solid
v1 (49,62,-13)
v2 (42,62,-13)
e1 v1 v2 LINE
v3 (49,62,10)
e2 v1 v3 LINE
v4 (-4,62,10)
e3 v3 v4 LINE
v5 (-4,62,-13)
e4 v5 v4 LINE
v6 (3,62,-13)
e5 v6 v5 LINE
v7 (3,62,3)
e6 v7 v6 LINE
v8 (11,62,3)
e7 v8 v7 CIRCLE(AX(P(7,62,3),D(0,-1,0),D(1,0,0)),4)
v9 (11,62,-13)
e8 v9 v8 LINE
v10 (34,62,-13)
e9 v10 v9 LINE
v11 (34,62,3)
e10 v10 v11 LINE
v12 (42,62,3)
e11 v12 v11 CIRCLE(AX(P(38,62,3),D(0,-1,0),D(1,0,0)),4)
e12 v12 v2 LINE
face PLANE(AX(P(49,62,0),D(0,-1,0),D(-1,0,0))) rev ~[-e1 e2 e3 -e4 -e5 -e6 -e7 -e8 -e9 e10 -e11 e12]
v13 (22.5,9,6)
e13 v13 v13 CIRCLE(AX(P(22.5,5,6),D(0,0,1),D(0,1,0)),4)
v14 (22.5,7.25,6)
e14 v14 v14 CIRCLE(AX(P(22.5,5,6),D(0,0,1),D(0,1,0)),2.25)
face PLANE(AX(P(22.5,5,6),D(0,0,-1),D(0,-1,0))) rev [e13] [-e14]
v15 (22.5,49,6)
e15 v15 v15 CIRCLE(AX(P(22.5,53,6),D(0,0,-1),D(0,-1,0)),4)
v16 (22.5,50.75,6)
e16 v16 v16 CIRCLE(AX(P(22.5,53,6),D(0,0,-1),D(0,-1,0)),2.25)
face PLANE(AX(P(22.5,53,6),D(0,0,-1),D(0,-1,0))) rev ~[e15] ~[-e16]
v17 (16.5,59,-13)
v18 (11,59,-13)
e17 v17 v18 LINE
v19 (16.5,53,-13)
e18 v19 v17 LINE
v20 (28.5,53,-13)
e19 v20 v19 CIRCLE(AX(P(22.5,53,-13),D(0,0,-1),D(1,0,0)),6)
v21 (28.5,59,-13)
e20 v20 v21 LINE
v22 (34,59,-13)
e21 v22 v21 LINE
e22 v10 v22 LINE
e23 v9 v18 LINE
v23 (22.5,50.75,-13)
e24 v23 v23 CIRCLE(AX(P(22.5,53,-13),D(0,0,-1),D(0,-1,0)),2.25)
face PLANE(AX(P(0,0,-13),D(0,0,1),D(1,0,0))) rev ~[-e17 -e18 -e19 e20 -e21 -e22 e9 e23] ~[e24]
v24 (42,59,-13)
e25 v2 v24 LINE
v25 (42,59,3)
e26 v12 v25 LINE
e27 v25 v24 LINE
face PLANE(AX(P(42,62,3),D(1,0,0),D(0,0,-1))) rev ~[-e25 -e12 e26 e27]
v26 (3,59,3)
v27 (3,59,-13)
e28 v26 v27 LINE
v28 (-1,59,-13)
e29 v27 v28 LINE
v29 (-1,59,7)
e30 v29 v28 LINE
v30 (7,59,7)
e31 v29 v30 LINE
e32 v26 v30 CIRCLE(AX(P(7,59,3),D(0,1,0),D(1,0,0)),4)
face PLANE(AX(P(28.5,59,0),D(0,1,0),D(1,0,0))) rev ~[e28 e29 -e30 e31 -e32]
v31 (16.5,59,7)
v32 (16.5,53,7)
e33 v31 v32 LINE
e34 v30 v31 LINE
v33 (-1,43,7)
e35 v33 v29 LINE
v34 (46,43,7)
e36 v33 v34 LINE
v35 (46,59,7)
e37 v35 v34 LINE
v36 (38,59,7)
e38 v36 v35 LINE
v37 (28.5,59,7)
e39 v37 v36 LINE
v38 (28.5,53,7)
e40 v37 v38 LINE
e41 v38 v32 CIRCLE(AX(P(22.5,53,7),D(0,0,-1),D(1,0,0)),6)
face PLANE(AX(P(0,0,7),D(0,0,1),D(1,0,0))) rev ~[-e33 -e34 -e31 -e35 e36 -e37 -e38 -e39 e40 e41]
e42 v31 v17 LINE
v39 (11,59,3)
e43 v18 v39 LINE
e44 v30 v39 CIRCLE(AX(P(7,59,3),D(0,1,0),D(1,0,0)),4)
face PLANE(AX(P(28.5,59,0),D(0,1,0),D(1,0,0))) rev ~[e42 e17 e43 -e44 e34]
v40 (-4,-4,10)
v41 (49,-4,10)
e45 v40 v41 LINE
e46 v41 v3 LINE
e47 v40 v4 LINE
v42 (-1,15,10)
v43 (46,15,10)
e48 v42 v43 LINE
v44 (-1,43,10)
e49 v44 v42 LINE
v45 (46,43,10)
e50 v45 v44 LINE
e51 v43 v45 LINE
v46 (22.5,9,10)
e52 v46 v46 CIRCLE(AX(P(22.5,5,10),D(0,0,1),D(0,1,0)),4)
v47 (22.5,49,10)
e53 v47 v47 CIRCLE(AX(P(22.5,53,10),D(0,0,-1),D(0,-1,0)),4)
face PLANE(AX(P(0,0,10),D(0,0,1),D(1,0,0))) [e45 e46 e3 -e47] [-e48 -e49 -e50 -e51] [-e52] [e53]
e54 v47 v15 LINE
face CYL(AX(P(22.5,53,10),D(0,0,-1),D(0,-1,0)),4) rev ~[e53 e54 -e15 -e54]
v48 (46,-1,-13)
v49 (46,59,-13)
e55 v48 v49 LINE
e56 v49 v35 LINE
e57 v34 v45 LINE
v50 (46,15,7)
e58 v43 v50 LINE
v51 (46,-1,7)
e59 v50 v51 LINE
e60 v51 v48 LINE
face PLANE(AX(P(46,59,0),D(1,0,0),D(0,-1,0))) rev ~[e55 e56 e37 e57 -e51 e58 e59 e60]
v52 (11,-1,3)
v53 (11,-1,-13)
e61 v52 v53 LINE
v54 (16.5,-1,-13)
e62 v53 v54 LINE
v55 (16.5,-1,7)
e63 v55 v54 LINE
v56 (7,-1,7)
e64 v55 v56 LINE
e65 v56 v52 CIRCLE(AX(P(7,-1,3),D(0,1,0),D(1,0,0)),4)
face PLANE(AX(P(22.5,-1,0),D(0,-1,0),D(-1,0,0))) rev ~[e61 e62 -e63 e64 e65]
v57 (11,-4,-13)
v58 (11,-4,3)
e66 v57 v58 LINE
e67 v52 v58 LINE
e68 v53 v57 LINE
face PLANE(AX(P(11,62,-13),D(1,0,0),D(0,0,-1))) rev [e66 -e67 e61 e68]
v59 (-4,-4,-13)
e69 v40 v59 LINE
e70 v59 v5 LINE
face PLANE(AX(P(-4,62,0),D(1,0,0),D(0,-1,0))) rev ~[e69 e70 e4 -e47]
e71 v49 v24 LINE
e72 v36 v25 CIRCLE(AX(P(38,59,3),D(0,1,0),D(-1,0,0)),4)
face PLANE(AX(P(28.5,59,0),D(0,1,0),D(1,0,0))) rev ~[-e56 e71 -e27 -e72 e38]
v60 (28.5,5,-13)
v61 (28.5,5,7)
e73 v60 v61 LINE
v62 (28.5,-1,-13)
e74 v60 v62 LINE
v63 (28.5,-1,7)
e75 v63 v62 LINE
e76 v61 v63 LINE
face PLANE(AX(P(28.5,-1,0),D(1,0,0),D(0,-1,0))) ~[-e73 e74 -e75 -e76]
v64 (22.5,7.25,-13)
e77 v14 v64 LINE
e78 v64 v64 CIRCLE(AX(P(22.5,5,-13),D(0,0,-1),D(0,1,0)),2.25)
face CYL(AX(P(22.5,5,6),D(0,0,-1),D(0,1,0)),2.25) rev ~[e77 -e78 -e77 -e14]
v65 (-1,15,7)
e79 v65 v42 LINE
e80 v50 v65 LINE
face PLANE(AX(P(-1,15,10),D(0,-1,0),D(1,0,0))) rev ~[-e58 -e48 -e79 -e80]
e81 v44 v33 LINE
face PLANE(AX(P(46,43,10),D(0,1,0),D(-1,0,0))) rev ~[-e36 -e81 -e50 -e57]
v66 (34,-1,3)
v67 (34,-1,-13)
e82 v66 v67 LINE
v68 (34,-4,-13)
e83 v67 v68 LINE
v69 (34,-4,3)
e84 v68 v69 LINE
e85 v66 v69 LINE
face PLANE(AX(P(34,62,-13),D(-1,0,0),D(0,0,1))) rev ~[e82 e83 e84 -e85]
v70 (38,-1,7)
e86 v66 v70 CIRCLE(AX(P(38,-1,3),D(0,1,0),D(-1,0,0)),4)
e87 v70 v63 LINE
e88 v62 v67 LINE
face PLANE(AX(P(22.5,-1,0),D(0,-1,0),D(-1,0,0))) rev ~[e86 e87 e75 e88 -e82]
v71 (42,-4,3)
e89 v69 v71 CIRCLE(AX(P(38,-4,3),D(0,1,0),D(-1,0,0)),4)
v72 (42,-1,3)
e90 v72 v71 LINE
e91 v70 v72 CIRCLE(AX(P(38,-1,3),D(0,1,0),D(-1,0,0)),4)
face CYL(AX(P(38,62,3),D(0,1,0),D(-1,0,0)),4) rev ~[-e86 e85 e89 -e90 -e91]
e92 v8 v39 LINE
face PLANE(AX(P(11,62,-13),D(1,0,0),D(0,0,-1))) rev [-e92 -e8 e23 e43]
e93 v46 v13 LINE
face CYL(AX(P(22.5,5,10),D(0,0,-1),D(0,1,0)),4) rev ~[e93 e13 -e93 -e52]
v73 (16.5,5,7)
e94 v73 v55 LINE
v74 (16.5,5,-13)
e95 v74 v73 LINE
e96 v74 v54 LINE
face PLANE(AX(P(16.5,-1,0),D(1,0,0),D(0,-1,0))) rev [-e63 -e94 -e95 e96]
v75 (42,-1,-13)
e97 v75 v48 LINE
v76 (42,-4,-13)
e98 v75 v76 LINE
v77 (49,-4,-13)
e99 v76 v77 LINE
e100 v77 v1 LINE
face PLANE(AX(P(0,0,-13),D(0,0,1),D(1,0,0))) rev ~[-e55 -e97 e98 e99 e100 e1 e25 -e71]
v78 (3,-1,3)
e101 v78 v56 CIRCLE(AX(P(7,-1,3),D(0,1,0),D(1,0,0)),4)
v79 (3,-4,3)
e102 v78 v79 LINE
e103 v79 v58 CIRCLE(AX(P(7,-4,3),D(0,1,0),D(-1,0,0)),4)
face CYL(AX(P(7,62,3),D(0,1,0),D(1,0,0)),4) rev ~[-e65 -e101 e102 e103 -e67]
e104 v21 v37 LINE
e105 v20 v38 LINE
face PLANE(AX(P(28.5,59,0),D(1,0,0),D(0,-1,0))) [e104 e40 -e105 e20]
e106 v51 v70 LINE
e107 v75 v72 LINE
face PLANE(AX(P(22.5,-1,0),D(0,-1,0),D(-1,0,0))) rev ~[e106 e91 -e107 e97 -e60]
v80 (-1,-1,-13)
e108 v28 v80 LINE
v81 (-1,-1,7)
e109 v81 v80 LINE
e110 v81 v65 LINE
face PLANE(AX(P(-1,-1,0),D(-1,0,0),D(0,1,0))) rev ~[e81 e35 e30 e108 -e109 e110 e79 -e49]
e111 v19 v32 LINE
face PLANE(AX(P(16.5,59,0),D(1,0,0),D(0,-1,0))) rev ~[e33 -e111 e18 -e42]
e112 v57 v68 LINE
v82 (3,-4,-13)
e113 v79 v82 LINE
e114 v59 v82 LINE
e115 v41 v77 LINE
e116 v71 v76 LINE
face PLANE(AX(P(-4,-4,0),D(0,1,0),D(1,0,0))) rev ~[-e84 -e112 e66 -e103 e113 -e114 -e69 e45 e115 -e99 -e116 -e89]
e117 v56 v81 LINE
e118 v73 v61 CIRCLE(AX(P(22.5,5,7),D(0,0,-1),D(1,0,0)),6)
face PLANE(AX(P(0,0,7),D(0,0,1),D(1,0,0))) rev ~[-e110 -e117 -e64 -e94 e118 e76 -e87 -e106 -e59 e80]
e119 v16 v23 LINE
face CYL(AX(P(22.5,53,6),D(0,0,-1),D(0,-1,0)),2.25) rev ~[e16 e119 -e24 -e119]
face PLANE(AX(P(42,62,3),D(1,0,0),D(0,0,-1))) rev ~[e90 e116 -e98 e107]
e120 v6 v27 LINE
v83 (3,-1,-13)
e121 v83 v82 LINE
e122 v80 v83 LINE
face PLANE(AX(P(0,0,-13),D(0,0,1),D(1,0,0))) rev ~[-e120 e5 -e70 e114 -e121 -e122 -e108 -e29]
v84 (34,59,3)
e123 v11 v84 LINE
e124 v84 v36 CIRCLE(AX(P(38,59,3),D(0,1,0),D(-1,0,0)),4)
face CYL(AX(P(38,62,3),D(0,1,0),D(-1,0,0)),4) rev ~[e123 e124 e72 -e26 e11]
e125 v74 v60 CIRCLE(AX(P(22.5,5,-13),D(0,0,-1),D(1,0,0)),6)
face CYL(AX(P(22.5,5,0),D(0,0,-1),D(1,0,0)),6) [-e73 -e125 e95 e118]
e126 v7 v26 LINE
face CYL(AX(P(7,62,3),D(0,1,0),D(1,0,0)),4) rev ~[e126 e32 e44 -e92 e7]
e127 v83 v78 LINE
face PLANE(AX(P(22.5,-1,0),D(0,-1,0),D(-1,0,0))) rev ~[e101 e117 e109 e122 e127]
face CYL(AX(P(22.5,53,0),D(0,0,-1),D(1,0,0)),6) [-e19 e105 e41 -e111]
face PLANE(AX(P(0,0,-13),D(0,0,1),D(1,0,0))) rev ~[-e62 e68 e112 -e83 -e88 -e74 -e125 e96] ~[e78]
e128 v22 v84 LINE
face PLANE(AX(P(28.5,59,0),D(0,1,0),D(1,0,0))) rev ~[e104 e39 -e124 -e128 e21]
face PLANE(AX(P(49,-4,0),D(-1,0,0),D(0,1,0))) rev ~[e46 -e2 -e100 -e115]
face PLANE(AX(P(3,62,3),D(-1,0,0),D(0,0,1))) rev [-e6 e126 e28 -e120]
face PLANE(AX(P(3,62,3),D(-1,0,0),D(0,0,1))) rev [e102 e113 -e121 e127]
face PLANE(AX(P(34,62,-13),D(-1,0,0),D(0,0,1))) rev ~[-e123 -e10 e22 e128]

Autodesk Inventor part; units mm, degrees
ref_plane "YZ Plane" through (0, 0, 0) normal (1, 0, 0) x (0, 1, 0)
sketch "Sketch1" plane through (0, 0, 0) normal (0, 0, 1) x (1, 0, 0)
  line L0 (0, 0) -> (45, 0)
  line L1 (45, 0) -> (45, 58)
  line L2 (45, 58) -> (0, 58)
  line L3 (0, 58) -> (0, 0)
  circle A0 centre (22.5, 53) radius 2.75
  circle A1 centre (22.5, 5) radius 2.75
  line L4 (19.75, 58) -> (19.75, 53)
  line L5 (25.25, 58) -> (25.25, 53)
  line L6 (0, 42) -> (45, 42)
  line L7 (45, 42) -> (45, 16)
  line L8 (45, 16) -> (0, 16)
  line L9 (0, 16) -> (0, 42)
  circle A2 centre (22.5, 53) radius 6
  circle A3 centre (22.5, 5) radius 6
  line L10 (16.5, 5) -> (16.5, -1)
  line L11 (28.5, 5) -> (28.5, -1)
  line L12 (16.5, 53) -> (16.5, 59)
  line L13 (28.5, 53) -> (28.5, 59)
  line L14 (-1, 59) -> (46, 59)
  line L15 (46, 59) -> (46, -1)
  line L16 (46, -1) -> (-1, -1)
  line L17 (-1, -1) -> (-1, 59)
  line L18 (49, 62) -> (-4, 62)
  line L19 (-4, 62) -> (-4, -4)
  line L20 (-4, -4) -> (49, -4)
  line L21 (49, -4) -> (49, 62)
  line L22 (28.5, 59) -> (16.5, 59)
  line L23 (28.5, -1) -> (16.5, -1)
  point P0 (22.5, 58)
  dimension "d0" = 45
  dimension "d1" = 58
  dimension "d2" = 5.5
  dimension "d3" = 5.5
  dimension "d4" = 5
  dimension "d5" = 5
  dimension "d6" = 26
  dimension "d7" = 16
  dimension "d8" = 12
  dimension "d9" = 12
  dimension "d10" = 1
  dimension "d11" = 3
extrude "Extrusion1" add sketch "Sketch1" along normal blind 10 contours L21 L20 L19 L18
sketch "Sketch2" plane through (0, 0, 10) normal (0, 0, 1) x (1, 0, 0)
  line L0 (-1, 59) -> (46, 59) projected
  line L1 (46, 59) -> (46, -1) projected
  line L2 (-1, 59) -> (46, 59)
  line L3 (46, 59) -> (46, 43)
  line L4 (46, 43) -> (-1, 43)
  line L5 (-1, 43) -> (-1, 59)
  line L6 (-1, -1) -> (-1, 59) projected
  line L7 (46, -1) -> (-1, -1)
  line L8 (-1, -1) -> (-1, 15)
  line L9 (-1, 15) -> (46, 15)
  line L10 (46, 15) -> (46, -1)
  point P0 (0, 0)
  dimension "d14" = 16
  dimension "d15" = 16
extrude "Extrusion2" add sketch "Sketch2" against normal blind 3 contours L0 L1 L4 L5 | L9 L1 L7 L6
sketch "Sketch3" plane through (0, 0, 0) normal (0, 0, -1) x (-1, 0, 0)
  arc A0 (-28.5, 53) -> (-16.5, 53) centre (-22.5, 53) ccw
  line L0 (-46, 59) -> (1, 59) projected
  line L1 (-28.5, 59) -> (-28.5, 53)
  line L2 (-16.5, 59) -> (-16.5, 53)
  line L3 (-16.5, 59) -> (-28.5, 59)
  point P0 (0, 0)
  dimension "d18" = 12
extrude "Extrusion3" add sketch "Sketch3" against normal up to surface (7 mm away)
ref_plane "Work Plane1" through (-4, 29, 0) normal (0, 1, 0) x (1, 0, 0)
mirror "Mirror1" about plane through (-4, 29, 0) normal (0, 1, 0) of "Extrusion3"
thicken "Thicken1" operation add thickness 13 both sides no extend neighbours yes toward (0, 0, -1) faces at (48, 39, 0)
sketch "Sketch4" plane through (-4, 62, 10) normal (0, 1, 0) x (1, 0, 0)
  line L0 (3, 3) -> (3, 0) projected
  line L1 (3, 0) -> (3, 3) projected
  line L2 (3, 23) -> (3, 3) projected
  line L3 (3, 23) -> (3, 3) projected
  line L4 (50, 0) -> (50, 3) projected
  line L5 (50, 23) -> (50, 3) projected
  line L6 (50, 23) -> (50, 3) projected
  line L7 (50, 3) -> (50, 0) projected
  line L8 (20.5, 3) -> (32.5, 3) projected
  line L9 (50, 3) -> (32.5, 3) projected
  line L10 (50, 3) -> (3, 3) projected
  line L11 (20.5, 3) -> (3, 3) projected
  line L12 (32.5, 23) -> (32.5, 3) projected
  line L13 (32.5, 23) -> (32.5, 3) projected
  line L14 (20.5, 23) -> (20.5, 3) projected
  line L15 (20.5, 3) -> (20.5, 23) projected
  line L16 (53, 23) -> (0, 23) projected
  line L17 (42, 23) -> (42, 7) construction
  line L18 (38, 23) -> (38, 7)
  line L19 (46, 7) -> (46, 23)
  arc A0 (46, 23) -> (38, 23) centre (42, 23) ccw
  arc A1 (38, 7) -> (46, 7) centre (42, 7) ccw
  point P0 (4, 10)
  point P1 (42, 15)
  dimension "d23" = 4
  dimension "d24" = 8
  dimension "d25" = 16
extrude "Extrusion4" cut sketch "Sketch4" against normal through all contours L16 L19 A1 L18
ref_plane "Work Plane2" through (22.5, -4, 10) normal (1, 0, 0) x (0, 0, -1)
mirror "Mirror2" about plane through (22.5, -4, 10) normal (1, 0, 0) of "Extrusion4"
hole "Hole1" at (22.5, 53, 10) direction (0, 0, -1) diameter 4.5 end through all counterbore diameter 8 counterbore depth 4 clearance for "Socket Head Cap Screw" size "M4" standard "Ansi Metric M Profile"
mirror "Mirror3" about plane through (-4, 29, 0) normal (0, 1, 0) of "Hole1"
properties part number "ssr-cover"
